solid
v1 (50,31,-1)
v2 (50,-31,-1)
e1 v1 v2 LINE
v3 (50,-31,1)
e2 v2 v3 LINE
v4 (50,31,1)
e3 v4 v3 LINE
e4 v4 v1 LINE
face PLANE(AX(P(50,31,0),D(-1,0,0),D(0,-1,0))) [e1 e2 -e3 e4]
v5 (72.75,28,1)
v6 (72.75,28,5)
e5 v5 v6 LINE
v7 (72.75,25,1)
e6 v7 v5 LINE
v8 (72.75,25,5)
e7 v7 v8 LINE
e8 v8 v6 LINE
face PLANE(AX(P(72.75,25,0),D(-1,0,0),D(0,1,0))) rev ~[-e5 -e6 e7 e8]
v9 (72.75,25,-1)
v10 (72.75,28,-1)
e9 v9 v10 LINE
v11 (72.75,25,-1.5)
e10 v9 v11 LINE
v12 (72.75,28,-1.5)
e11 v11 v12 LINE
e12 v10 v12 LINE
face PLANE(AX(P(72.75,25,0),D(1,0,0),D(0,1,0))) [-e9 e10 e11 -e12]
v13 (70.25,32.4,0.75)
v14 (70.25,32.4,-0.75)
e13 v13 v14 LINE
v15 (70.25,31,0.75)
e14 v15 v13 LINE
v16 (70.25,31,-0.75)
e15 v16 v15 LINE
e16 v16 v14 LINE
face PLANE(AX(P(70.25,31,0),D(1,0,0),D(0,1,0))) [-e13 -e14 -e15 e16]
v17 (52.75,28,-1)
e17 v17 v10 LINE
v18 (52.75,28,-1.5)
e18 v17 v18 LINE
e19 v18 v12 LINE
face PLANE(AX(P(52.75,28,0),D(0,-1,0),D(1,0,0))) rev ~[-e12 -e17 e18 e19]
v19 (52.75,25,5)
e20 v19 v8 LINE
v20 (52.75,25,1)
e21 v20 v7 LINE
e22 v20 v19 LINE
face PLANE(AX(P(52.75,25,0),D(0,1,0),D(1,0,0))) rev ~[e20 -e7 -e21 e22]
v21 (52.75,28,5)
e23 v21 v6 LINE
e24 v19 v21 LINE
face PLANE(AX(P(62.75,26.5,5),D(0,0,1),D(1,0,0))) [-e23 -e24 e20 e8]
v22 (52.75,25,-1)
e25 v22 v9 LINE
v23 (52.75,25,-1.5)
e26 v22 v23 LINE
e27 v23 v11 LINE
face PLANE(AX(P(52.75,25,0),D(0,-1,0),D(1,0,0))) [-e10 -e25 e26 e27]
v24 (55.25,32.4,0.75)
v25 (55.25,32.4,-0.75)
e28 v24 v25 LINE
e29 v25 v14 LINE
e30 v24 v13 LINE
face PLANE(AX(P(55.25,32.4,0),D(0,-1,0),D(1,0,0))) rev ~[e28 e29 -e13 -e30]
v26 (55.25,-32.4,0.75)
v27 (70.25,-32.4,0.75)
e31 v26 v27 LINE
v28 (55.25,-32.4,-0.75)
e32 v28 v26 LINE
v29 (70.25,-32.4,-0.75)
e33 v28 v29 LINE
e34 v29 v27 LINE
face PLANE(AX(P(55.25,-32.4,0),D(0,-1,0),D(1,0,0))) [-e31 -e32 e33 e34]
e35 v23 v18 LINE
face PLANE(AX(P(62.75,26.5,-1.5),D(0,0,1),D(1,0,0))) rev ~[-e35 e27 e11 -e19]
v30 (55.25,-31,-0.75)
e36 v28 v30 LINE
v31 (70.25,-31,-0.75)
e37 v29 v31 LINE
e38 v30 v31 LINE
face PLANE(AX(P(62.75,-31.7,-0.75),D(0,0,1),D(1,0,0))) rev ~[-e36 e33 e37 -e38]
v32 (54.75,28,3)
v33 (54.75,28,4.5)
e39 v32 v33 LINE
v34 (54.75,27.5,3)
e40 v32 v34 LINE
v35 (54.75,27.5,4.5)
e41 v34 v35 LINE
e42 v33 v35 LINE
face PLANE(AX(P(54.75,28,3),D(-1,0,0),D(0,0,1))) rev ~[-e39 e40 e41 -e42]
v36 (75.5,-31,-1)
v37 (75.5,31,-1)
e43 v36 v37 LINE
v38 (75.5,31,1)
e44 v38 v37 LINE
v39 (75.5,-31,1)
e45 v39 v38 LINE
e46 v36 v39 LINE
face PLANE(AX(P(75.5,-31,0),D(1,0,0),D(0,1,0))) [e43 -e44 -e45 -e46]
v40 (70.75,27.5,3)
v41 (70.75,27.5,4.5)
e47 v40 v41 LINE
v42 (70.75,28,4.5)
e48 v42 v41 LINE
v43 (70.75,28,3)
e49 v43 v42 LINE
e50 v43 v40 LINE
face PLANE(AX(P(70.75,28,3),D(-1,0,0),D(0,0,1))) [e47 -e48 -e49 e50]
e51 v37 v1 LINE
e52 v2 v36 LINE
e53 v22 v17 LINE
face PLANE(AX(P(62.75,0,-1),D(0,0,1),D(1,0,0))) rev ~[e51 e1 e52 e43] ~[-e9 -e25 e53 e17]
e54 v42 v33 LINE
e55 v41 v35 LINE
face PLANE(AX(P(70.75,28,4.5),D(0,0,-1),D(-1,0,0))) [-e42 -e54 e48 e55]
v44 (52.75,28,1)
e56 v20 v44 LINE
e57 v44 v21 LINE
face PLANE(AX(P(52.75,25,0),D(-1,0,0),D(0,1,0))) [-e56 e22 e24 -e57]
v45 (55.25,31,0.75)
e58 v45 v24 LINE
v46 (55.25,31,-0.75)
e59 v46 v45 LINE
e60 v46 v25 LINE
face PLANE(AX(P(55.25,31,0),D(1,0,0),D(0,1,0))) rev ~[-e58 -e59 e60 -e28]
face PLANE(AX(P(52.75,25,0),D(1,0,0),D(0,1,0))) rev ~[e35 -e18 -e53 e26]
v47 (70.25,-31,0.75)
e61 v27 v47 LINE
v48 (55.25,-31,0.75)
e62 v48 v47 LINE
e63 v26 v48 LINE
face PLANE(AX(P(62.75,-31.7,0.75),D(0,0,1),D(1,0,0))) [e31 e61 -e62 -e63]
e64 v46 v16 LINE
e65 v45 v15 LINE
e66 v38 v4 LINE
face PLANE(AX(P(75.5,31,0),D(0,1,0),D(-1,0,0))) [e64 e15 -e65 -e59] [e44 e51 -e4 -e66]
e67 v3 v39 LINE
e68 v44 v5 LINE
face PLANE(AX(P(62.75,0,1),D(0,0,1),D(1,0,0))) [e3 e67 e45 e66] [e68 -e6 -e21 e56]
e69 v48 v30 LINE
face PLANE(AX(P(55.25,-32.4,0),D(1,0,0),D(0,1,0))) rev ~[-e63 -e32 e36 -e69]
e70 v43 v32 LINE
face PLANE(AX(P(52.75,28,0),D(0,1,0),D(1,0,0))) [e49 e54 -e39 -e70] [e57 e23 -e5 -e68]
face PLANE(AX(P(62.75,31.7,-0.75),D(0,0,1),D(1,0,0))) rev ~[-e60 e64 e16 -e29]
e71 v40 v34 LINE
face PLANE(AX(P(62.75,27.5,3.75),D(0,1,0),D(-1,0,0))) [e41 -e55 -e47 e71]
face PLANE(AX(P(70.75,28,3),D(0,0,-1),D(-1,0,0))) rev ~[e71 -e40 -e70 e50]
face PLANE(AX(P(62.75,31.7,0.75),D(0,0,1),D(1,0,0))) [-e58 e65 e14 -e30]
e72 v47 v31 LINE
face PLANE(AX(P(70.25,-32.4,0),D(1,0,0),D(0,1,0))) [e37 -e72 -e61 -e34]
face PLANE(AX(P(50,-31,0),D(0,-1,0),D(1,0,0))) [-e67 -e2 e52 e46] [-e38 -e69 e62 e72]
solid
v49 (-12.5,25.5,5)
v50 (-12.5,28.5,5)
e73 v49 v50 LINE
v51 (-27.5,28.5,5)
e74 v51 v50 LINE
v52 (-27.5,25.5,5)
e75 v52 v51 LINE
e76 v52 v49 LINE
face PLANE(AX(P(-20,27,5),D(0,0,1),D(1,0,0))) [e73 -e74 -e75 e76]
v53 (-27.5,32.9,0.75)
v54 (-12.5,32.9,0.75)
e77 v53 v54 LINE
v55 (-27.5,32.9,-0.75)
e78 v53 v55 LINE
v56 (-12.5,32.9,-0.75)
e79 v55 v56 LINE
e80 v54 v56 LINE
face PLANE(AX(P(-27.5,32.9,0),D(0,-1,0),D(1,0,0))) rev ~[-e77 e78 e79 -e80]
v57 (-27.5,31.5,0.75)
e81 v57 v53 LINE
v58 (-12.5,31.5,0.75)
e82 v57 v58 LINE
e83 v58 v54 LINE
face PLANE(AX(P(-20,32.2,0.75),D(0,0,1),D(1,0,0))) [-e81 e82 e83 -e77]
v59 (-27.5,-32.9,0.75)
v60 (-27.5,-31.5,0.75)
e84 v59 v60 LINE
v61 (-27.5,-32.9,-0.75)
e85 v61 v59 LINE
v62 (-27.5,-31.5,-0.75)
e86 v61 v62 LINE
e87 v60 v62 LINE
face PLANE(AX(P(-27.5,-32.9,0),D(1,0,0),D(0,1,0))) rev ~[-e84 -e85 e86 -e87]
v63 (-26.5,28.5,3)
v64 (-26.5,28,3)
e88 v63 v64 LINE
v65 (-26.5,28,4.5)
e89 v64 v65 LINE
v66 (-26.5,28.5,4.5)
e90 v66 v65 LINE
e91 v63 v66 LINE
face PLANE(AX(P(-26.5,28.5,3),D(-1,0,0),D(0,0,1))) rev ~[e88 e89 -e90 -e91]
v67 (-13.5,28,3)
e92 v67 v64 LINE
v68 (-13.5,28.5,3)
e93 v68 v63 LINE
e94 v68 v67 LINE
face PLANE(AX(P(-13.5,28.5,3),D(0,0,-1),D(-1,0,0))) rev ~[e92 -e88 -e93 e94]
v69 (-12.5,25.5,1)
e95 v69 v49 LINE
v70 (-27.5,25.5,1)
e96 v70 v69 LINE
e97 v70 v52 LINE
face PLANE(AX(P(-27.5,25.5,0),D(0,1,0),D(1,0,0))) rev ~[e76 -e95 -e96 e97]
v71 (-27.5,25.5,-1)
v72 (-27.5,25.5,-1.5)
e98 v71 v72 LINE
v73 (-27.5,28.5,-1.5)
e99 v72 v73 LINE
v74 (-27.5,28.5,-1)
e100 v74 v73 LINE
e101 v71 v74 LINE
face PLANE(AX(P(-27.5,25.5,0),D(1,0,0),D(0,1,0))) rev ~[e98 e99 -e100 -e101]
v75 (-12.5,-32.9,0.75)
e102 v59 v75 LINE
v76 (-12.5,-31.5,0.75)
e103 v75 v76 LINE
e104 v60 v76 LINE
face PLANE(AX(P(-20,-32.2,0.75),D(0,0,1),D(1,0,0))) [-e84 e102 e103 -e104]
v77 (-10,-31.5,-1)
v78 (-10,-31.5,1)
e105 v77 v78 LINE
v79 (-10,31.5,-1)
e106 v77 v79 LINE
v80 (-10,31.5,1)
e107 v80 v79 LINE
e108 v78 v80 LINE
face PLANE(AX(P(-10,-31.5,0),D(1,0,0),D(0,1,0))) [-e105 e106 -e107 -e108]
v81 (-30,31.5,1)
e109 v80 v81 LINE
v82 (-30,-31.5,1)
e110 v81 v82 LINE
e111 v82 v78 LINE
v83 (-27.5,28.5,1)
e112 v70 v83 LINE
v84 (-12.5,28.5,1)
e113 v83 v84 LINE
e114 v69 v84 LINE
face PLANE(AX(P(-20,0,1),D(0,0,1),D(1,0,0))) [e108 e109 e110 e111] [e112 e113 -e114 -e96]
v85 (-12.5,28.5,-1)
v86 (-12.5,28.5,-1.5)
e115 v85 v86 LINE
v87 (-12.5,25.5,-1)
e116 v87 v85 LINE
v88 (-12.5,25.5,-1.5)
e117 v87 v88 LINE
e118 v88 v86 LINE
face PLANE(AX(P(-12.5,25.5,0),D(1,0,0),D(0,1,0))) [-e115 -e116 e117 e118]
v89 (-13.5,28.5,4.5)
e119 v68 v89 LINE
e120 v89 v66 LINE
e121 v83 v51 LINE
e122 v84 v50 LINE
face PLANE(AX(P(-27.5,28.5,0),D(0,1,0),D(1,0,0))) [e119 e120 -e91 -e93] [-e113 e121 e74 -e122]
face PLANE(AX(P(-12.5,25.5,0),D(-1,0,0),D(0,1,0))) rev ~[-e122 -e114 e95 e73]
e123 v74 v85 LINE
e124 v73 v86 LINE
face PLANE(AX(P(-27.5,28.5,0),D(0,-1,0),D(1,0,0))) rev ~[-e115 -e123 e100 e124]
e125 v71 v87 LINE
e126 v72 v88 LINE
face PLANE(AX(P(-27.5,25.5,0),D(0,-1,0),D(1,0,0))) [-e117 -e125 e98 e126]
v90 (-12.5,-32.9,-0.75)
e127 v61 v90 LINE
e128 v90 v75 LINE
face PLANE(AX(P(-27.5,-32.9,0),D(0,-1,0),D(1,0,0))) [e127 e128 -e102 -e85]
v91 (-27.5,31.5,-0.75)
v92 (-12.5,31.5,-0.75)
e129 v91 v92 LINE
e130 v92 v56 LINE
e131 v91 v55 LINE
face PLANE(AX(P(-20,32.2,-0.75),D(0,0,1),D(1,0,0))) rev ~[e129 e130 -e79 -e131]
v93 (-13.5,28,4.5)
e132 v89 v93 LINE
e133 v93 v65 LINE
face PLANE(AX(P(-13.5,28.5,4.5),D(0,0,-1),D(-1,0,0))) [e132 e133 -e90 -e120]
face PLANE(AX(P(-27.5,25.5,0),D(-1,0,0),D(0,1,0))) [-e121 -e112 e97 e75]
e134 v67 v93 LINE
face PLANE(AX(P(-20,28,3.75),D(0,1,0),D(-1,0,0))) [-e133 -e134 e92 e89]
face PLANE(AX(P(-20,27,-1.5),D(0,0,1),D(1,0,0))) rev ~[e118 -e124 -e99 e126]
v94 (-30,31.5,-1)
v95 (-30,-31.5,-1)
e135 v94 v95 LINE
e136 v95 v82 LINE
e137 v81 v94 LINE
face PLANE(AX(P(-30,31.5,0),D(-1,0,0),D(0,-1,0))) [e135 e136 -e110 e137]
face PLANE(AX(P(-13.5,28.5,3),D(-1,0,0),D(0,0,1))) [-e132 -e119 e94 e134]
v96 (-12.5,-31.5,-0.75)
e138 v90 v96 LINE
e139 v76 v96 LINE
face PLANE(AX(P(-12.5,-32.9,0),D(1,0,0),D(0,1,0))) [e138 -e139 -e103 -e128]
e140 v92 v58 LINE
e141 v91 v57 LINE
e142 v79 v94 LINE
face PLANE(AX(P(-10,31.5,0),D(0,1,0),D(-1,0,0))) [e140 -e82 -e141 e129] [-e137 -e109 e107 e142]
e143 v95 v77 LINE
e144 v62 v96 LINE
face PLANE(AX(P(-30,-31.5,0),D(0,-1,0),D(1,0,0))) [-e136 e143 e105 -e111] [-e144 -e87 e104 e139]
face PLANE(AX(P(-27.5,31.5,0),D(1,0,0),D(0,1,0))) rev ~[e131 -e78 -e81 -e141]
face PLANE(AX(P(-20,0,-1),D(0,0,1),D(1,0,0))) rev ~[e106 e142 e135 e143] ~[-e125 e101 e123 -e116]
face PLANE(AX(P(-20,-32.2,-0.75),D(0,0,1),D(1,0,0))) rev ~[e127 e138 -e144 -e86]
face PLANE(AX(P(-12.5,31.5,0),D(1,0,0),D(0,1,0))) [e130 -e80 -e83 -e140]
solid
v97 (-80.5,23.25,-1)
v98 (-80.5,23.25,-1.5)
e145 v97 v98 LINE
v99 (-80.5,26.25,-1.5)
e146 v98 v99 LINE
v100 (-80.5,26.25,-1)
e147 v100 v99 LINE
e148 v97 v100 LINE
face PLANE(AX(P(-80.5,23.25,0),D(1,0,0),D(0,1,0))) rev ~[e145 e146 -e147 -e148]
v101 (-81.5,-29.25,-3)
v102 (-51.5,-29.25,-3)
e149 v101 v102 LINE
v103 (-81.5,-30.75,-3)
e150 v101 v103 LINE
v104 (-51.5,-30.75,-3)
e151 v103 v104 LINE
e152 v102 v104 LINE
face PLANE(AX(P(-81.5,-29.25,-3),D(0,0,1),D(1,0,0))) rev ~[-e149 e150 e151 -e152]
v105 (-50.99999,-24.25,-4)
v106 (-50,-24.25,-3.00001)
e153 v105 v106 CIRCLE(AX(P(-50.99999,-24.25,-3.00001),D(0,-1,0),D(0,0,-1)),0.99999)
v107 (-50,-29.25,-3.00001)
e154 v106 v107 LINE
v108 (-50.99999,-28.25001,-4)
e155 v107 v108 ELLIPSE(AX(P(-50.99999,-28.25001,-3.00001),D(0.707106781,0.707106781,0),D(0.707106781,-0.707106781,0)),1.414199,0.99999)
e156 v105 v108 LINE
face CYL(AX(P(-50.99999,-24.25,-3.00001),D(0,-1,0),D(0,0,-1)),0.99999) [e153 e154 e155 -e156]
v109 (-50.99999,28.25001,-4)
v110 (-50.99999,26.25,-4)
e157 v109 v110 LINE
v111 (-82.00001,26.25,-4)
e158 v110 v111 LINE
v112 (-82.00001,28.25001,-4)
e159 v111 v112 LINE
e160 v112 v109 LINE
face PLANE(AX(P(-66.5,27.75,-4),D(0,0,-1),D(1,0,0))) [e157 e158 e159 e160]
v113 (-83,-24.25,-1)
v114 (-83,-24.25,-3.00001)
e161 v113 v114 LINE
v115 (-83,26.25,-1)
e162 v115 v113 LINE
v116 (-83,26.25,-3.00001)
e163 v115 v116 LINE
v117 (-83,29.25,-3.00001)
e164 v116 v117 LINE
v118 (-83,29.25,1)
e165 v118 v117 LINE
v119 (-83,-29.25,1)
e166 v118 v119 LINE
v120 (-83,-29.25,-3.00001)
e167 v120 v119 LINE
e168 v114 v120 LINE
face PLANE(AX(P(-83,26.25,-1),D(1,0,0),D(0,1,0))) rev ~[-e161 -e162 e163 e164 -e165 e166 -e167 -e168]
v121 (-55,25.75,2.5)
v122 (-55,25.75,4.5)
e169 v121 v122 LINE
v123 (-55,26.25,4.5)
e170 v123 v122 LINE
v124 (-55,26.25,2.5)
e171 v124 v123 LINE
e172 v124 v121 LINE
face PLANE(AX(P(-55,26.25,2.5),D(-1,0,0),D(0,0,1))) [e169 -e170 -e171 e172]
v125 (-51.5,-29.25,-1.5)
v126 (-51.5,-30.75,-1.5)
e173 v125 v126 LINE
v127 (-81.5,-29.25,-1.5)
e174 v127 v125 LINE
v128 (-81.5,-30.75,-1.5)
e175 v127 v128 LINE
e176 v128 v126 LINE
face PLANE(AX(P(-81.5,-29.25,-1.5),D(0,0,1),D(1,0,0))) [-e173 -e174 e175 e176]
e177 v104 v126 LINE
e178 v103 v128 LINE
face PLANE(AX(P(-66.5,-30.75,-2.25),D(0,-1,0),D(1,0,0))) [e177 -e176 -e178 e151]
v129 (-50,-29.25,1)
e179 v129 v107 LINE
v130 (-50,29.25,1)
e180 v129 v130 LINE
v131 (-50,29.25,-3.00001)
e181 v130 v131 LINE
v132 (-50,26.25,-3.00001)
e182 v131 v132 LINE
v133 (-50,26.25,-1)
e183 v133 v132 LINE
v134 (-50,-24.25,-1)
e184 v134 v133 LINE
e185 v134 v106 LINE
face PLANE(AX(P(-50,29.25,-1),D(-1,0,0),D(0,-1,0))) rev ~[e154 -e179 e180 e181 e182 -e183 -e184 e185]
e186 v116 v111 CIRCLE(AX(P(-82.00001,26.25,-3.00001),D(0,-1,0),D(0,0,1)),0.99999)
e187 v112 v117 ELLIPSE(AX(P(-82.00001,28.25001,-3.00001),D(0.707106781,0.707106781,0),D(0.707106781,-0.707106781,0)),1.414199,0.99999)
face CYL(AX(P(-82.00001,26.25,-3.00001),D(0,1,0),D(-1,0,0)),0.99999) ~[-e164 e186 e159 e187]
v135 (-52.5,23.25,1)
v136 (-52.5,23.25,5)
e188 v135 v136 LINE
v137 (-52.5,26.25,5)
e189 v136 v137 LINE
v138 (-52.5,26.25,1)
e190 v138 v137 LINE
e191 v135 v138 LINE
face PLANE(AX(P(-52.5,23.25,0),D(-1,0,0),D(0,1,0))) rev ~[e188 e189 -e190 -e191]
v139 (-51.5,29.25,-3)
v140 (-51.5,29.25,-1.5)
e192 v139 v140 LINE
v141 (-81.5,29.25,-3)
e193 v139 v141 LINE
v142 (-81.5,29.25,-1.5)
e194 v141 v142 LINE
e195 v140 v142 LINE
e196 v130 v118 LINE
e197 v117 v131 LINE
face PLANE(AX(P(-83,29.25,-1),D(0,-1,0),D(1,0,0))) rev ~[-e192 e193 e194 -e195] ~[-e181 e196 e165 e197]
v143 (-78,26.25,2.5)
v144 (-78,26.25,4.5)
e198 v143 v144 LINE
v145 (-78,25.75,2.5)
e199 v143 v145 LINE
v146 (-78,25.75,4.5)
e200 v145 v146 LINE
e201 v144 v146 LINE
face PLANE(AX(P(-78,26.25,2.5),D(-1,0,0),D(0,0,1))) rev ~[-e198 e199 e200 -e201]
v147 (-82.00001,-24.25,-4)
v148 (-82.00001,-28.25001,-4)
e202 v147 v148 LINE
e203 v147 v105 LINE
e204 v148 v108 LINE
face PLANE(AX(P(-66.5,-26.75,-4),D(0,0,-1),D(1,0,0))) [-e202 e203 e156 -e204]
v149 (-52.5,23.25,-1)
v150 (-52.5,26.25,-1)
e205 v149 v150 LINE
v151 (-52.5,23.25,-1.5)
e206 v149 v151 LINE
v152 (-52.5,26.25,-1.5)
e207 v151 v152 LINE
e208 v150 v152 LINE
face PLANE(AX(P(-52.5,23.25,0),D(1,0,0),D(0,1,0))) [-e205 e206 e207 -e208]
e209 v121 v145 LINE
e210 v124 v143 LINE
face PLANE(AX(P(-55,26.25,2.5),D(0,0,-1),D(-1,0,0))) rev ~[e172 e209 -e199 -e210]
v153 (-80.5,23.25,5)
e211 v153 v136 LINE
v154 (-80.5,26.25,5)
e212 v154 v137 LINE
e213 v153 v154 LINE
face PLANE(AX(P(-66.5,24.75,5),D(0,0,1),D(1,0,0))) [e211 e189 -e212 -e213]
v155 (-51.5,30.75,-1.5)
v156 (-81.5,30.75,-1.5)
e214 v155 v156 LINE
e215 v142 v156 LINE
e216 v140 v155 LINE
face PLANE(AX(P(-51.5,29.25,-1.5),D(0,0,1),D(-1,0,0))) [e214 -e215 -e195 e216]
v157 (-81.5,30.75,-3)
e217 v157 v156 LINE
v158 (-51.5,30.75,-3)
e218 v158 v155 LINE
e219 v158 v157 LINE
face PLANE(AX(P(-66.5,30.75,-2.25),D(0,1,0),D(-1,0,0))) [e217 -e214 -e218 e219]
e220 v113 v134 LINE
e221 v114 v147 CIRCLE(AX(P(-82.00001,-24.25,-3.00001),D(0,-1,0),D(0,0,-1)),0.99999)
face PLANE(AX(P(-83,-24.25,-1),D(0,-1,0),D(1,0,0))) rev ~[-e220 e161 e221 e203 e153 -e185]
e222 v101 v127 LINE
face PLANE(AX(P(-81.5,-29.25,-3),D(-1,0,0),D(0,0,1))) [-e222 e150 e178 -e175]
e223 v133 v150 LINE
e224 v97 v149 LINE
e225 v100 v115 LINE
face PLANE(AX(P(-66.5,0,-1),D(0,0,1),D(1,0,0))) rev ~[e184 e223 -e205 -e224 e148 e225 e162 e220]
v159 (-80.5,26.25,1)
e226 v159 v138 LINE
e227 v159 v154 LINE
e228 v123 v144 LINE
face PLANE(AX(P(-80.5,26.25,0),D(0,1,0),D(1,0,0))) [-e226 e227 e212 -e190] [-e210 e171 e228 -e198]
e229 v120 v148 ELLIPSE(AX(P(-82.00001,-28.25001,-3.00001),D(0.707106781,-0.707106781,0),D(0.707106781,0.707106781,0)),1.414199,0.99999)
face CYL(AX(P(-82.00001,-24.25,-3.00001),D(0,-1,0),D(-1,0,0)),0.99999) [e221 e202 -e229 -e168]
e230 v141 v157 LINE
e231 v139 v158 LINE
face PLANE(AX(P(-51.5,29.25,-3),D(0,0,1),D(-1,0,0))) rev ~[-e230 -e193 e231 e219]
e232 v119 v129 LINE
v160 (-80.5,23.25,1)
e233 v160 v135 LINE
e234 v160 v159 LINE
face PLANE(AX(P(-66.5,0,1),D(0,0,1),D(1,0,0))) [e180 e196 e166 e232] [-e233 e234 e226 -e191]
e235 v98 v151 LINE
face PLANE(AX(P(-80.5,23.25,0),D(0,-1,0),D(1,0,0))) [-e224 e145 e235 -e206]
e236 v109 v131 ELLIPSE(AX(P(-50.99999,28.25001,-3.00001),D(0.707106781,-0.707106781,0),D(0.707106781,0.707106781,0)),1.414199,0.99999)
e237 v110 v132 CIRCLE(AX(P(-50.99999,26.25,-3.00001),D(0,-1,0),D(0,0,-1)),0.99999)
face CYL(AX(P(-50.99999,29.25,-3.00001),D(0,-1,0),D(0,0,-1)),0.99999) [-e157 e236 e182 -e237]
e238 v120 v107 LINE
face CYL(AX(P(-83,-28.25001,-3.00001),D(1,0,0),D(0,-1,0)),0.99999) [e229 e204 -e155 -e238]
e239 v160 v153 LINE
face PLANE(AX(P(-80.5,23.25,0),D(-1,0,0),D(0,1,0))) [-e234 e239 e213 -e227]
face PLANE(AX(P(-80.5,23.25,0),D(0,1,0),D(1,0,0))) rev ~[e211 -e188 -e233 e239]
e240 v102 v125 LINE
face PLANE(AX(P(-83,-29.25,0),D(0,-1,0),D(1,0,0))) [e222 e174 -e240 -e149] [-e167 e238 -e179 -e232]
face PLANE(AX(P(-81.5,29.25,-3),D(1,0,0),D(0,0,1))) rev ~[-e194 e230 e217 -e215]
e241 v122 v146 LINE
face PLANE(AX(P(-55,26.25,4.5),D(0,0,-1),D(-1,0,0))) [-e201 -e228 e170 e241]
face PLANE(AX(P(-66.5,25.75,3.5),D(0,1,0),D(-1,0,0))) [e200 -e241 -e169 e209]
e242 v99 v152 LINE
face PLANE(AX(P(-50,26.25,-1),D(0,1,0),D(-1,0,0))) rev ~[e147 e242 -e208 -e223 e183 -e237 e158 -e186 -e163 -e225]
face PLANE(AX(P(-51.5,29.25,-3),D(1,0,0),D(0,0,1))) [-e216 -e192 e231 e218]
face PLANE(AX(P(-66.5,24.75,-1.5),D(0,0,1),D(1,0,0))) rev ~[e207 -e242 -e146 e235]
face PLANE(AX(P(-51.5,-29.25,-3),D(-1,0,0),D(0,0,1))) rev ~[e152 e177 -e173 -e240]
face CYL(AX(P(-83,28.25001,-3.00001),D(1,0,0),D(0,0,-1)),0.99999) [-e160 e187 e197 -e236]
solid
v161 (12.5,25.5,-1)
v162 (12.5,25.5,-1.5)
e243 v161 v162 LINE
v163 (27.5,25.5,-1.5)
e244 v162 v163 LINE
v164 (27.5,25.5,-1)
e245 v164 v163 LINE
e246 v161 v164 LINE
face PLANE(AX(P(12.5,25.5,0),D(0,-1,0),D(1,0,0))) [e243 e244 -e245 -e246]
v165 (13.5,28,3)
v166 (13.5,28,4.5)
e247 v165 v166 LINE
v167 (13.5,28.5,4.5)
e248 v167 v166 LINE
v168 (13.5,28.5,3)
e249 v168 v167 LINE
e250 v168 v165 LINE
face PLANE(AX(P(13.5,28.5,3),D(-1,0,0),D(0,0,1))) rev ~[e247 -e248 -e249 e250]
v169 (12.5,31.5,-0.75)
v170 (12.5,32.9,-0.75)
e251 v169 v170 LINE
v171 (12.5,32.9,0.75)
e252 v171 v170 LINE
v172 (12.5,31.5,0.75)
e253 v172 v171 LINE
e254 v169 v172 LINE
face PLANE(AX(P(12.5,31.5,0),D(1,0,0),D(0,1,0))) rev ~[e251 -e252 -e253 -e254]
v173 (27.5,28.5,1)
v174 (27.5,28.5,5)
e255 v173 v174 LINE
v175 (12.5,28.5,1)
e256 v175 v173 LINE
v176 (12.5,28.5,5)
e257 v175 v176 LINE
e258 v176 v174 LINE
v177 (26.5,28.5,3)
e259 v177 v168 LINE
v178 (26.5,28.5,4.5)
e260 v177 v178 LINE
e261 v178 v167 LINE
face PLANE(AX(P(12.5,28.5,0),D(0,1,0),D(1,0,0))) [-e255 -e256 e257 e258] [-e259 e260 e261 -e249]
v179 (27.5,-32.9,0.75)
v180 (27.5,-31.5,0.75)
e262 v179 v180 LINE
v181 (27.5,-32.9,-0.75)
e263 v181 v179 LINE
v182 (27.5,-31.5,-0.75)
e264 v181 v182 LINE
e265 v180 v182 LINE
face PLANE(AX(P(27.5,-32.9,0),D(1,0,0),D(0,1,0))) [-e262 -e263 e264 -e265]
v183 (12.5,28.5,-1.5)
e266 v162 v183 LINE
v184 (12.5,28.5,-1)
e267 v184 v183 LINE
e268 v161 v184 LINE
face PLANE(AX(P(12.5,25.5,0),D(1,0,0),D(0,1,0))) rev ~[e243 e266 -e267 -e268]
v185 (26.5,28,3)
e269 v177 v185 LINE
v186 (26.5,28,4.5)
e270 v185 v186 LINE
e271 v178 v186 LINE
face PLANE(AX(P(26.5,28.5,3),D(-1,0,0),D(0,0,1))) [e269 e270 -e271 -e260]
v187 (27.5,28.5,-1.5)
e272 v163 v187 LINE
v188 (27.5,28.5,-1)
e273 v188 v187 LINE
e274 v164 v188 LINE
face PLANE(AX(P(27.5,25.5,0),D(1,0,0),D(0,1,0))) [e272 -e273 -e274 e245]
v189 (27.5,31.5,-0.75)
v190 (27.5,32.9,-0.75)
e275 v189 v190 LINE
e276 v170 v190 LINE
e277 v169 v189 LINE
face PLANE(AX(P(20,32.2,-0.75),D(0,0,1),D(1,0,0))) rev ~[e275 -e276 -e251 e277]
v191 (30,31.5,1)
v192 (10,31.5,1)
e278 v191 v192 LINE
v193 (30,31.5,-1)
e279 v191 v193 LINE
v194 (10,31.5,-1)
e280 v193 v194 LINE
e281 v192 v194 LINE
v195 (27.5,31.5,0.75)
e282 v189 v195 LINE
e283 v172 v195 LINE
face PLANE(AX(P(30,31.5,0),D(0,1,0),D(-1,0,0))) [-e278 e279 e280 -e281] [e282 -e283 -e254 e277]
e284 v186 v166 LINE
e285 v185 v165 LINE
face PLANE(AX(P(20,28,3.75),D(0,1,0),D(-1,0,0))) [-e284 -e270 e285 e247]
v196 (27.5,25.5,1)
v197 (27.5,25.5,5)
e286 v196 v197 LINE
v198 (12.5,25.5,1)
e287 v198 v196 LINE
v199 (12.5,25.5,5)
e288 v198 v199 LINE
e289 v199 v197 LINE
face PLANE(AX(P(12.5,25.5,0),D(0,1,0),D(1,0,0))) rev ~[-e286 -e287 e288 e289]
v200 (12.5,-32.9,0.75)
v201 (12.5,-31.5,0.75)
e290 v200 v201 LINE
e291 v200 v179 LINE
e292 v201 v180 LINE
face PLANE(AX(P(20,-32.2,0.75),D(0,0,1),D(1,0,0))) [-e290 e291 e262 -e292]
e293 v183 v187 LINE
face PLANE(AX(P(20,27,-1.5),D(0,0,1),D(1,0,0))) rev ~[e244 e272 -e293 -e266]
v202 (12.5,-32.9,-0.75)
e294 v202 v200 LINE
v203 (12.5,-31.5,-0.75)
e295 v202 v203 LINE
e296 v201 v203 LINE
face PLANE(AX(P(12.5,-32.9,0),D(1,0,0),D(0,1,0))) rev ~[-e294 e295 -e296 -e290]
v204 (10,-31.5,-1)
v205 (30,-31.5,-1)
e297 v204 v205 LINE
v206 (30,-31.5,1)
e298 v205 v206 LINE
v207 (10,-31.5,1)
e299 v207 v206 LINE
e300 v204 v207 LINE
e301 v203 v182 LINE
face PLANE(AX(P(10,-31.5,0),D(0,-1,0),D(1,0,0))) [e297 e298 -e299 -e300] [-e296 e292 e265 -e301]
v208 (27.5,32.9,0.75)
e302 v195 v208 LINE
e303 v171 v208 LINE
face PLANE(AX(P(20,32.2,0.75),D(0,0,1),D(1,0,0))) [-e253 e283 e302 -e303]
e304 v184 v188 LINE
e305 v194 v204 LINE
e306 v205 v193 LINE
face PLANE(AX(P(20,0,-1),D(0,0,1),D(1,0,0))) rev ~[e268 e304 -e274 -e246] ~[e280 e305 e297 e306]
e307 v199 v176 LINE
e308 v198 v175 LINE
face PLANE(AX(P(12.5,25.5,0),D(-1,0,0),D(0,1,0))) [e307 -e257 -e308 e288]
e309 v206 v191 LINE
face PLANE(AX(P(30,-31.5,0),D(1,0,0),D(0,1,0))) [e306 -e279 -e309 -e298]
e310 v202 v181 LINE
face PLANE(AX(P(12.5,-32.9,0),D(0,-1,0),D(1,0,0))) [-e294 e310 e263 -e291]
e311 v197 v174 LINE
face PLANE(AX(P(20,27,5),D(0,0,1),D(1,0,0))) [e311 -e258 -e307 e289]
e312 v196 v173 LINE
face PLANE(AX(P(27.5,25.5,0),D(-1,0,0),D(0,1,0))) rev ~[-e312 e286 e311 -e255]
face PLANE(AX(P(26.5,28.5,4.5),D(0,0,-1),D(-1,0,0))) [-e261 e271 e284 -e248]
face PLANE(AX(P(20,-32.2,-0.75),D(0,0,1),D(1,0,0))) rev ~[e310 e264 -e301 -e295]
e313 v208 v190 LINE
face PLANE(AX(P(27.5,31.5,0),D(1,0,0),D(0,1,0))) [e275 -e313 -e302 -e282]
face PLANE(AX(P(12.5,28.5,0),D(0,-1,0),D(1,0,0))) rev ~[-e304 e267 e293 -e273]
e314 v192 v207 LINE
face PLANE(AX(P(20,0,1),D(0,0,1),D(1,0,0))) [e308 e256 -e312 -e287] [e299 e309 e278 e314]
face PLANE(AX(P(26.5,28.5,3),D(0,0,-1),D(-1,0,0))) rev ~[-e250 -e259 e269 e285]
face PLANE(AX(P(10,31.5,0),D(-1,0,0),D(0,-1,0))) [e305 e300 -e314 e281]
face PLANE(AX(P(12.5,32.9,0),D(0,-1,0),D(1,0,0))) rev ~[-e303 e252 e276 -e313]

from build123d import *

# Parameters (mm, degrees)
F0_W          = 15
F0_H          = 1.4
F1_DEPTH      = 0.75
F0_W_2        = 28
F0_H_2        = 3
F2_DEPTH      = 1
F0_W_3        = 20
F3_DEPTH      = 5
F3_DEPTH_BACK = 1.5
F4_W          = 23
F4_H          = 2
F5_DEPTH      = 0.5
F6_W          = 13
F6_H          = 1.5
F7_DEPTH      = 0.5
F8_W          = 16
F8_H          = 1.5
F9_DEPTH      = 0.5
F10_W         = 33
F10_H         = 5
F11_DEPTH     = 3
F12_W         = 30
F12_H         = 1.5
F13_DEPTH     = 1.5
F14_W         = 30
F14_H         = 1.5
F15_DEPTH     = 1.5
F16_R         = 0.99999


# Not quite as in the source:
# - a fillet or chamfer is up to 0.001 mm smaller than in the source, because OpenCascade refuses the exact size
# - a feature names something its author has since deleted; it is built from what else it names


with BuildPart() as f1:
    # F0 (on Top) → F1 (new body, symmetric)
    with BuildSketch(Plane.XY):
        with Locations((-20, 32.2)):
            Rectangle(F0_W, F0_H)
    extrude(amount=F1_DEPTH, both=True)



with BuildPart() as f1b:
    # F0 (on Top) → F1, piece 2 (new body, symmetric)
    with BuildSketch(Plane.XY):
        with Locations((20, 32.2)):
            Rectangle(F0_W, F0_H)
    extrude(amount=F1_DEPTH, both=True)



with BuildPart() as f1c:
    # F0 (on Top) → F1, piece 3 (new body, symmetric)
    with BuildSketch(Plane.XY):
        with Locations((62.75, 31.7)):
            Rectangle(F0_W, F0_H)
    extrude(amount=F1_DEPTH, both=True)



with BuildPart() as f1d:
    # F0 (on Top) → F1, piece 4 (new body, symmetric)
    with BuildSketch(Plane.XY):
        with Locations((62.75, -31.7)):
            Rectangle(F0_W, F0_H)
    extrude(amount=F1_DEPTH, both=True)


with BuildPart() as f1e:
    # F0 (on Top) → F1, piece 5 (new body, symmetric)
    with BuildSketch(Plane.XY):
        with Locations((20, -32.2)):
            Rectangle(F0_W, F0_H)
    extrude(amount=F1_DEPTH, both=True)


with BuildPart() as f1f:
    # F0 (on Top) → F1, piece 6 (new body, symmetric)
    with BuildSketch(Plane.XY):
        with Locations((-20, -32.2)):
            Rectangle(F0_W, F0_H)
    extrude(amount=F1_DEPTH, both=True)


with BuildPart() as f2:
    # F0 (on Top) → F2 (new body, symmetric)
    with BuildSketch(Plane.XY):
        Polygon((-50, 29.25), (-83, 29.25), (-83, -29.25), (-76, -29.25), (-57, -29.25), (-50, -29.25), align=None)
        with Locations((-66.5, 24.75)):
            Rectangle(F0_W_2, F0_H_2, mode=Mode.SUBTRACT)
    extrude(amount=F2_DEPTH, both=True)

    # F0 (on Top) → F3 (join, two sides)
    with BuildSketch(Plane.XY) as f3_sk:
        with Locations((-66.5, 24.75)):
            Rectangle(F0_W_2, F0_H_2)
    extrude(amount=F3_DEPTH)
    extrude(f3_sk.sketch, amount=-F3_DEPTH_BACK)

    # F4 (on face) → F5 (cut)
    with BuildSketch(Plane(origin=(0, 26.25, 0), x_dir=(-1, 0, 0), z_dir=(0, 1, 0))):
        with Locations((66.5, 3.5)):
            Rectangle(F4_W, F4_H)
    extrude(amount=-F5_DEPTH, mode=Mode.SUBTRACT)

    # F10 (on face) → F11 (join)
    with BuildSketch(Plane(origin=(0, 0, -1), x_dir=(1, 0, 0), z_dir=(0, 0, -1))):
        Polygon((-83, -26.25), (-83, -29.25), (-50, -29.25), (-50, -26.25), (-52.5, -26.25), (-80.5, -26.25), align=None)
        with Locations((-66.5, 26.75)):
            Rectangle(F10_W, F10_H)
    extrude(amount=F11_DEPTH)

    # F12 (on face) → F13 (join)
    with BuildSketch(Plane(origin=(0, 29.25, 0), x_dir=(-1, 0, 0), z_dir=(0, 1, 0))):
        with Locations((66.5, -2.25)):
            Rectangle(F12_W, F12_H)
    extrude(amount=F13_DEPTH)

    # F14 (on face) → F15 (join)
    with BuildSketch(Plane.XZ.offset(29.25)):
        with Locations((-66.5, -2.25)):
            Rectangle(F14_W, F14_H)
    extrude(amount=F15_DEPTH)

    # F16 (radius 1 in the source; OpenCascade refuses exactly that, so slightly less here)
    f16_edges = [f2.edges().sort_by_distance(p)[0] for p in [
        (-66.5, 29.25, -4),
        (-66.5, -29.25, -4),
        (-83, 27.75, -4),
        (-83, -26.75, -4),
        (-50, 27.75, -4),
        (-50, -26.75, -4),
    ]]
    fillet(f16_edges, radius=F16_R)


with BuildPart() as f1_1:
    add(f1.part)

    add(f1f.part)  # F2#2 merges F1f
    # F0 (on Top) → F2, piece 2 (join, symmetric)
    with BuildSketch(Plane.XY):
        Polygon((-27.5, 31.5), (-30, 31.5), (-30, -31.5), (-27.5, -31.5), (-12.5, -31.5), (-10, -31.5), (-10, 31.5), (-12.5, 31.5), align=None)
        with Locations((-20, 27)):
            Rectangle(F0_W, F0_H_2, mode=Mode.SUBTRACT)
    extrude(amount=F2_DEPTH, both=True)

    # F0 (on Top) → F3, piece 2 (join, two sides)
    with BuildSketch(Plane.XY) as f3_2_sk:
        with Locations((-20, 27)):
            Rectangle(F0_W, F0_H_2)
    extrude(amount=F3_DEPTH)
    extrude(f3_2_sk.sketch, amount=-F3_DEPTH_BACK)


with BuildPart() as f1b_1:
    add(f1b.part)

    add(f1e.part)  # F2#3 merges F1e
    # F0 (on Top) → F2, piece 3 (join, symmetric)
    with BuildSketch(Plane.XY):
        Polygon((12.5, 31.5), (10, 31.5), (10, -31.5), (12.5, -31.5), (27.5, -31.5), (30, -31.5), (30, 31.5), (27.5, 31.5), align=None)
        with Locations((20, 27)):
            Rectangle(F0_W, F0_H_2, mode=Mode.SUBTRACT)
    extrude(amount=F2_DEPTH, both=True)

    # F0 (on Top) → F3, piece 3 (join, two sides)
    with BuildSketch(Plane.XY) as f3_3_sk:
        with Locations((20, 27)):
            Rectangle(F0_W, F0_H_2)
    extrude(amount=F3_DEPTH)
    extrude(f3_3_sk.sketch, amount=-F3_DEPTH_BACK)


with BuildPart() as f1c_1:
    add(f1c.part)

    add(f1d.part)  # F2#4 merges F1d
    # F0 (on Top) → F2, piece 4 (join, symmetric)
    with BuildSketch(Plane.XY):
        Polygon((55.25, 31), (50, 31), (50, -31), (55.25, -31), (70.25, -31), (75.5, -31), (75.5, 31), (70.25, 31), align=None)
        with Locations((62.75, 26.5)):
            Rectangle(F0_W_3, F0_H_2, mode=Mode.SUBTRACT)
    extrude(amount=F2_DEPTH, both=True)

    # F0 (on Top) → F3, piece 4 (join, two sides)
    with BuildSketch(Plane.XY) as f3_4_sk:
        with Locations((62.75, 26.5)):
            Rectangle(F0_W_3, F0_H_2)
    extrude(amount=F3_DEPTH)
    extrude(f3_4_sk.sketch, amount=-F3_DEPTH_BACK)

    # F8 (on face) → F9 (cut)
    with BuildSketch(Plane(origin=(0, 28, 0), x_dir=(-1, 0, 0), z_dir=(0, 1, 0))):
        with Locations((-62.75, 3.75)):
            Rectangle(F8_W, F8_H)
    extrude(amount=-F9_DEPTH, mode=Mode.SUBTRACT)


with BuildPart() as f7_tool:
    # F6 (on face) → F7 (new body)
    with BuildSketch(Plane(origin=(0, 28.5, 0), x_dir=(-1, 0, 0), z_dir=(0, 1, 0))):
        with Locations((-20, 3.75)):
            Rectangle(F6_W, F6_H)
        with Locations((20, 3.75)):
            Rectangle(F6_W, F6_H)
    extrude(amount=-F7_DEPTH)


with BuildPart() as f1_2:
    add(f1_1.part)

    # F7: cut by f7_tool
    add(f7_tool.part, mode=Mode.SUBTRACT)


with BuildPart() as f1b_2:
    add(f1b_1.part)

    # F7: cut by f7_tool
    add(f7_tool.part, mode=Mode.SUBTRACT)


solid = Compound([f2.part, f1c_1.part, f1_2.part, f1b_2.part])
